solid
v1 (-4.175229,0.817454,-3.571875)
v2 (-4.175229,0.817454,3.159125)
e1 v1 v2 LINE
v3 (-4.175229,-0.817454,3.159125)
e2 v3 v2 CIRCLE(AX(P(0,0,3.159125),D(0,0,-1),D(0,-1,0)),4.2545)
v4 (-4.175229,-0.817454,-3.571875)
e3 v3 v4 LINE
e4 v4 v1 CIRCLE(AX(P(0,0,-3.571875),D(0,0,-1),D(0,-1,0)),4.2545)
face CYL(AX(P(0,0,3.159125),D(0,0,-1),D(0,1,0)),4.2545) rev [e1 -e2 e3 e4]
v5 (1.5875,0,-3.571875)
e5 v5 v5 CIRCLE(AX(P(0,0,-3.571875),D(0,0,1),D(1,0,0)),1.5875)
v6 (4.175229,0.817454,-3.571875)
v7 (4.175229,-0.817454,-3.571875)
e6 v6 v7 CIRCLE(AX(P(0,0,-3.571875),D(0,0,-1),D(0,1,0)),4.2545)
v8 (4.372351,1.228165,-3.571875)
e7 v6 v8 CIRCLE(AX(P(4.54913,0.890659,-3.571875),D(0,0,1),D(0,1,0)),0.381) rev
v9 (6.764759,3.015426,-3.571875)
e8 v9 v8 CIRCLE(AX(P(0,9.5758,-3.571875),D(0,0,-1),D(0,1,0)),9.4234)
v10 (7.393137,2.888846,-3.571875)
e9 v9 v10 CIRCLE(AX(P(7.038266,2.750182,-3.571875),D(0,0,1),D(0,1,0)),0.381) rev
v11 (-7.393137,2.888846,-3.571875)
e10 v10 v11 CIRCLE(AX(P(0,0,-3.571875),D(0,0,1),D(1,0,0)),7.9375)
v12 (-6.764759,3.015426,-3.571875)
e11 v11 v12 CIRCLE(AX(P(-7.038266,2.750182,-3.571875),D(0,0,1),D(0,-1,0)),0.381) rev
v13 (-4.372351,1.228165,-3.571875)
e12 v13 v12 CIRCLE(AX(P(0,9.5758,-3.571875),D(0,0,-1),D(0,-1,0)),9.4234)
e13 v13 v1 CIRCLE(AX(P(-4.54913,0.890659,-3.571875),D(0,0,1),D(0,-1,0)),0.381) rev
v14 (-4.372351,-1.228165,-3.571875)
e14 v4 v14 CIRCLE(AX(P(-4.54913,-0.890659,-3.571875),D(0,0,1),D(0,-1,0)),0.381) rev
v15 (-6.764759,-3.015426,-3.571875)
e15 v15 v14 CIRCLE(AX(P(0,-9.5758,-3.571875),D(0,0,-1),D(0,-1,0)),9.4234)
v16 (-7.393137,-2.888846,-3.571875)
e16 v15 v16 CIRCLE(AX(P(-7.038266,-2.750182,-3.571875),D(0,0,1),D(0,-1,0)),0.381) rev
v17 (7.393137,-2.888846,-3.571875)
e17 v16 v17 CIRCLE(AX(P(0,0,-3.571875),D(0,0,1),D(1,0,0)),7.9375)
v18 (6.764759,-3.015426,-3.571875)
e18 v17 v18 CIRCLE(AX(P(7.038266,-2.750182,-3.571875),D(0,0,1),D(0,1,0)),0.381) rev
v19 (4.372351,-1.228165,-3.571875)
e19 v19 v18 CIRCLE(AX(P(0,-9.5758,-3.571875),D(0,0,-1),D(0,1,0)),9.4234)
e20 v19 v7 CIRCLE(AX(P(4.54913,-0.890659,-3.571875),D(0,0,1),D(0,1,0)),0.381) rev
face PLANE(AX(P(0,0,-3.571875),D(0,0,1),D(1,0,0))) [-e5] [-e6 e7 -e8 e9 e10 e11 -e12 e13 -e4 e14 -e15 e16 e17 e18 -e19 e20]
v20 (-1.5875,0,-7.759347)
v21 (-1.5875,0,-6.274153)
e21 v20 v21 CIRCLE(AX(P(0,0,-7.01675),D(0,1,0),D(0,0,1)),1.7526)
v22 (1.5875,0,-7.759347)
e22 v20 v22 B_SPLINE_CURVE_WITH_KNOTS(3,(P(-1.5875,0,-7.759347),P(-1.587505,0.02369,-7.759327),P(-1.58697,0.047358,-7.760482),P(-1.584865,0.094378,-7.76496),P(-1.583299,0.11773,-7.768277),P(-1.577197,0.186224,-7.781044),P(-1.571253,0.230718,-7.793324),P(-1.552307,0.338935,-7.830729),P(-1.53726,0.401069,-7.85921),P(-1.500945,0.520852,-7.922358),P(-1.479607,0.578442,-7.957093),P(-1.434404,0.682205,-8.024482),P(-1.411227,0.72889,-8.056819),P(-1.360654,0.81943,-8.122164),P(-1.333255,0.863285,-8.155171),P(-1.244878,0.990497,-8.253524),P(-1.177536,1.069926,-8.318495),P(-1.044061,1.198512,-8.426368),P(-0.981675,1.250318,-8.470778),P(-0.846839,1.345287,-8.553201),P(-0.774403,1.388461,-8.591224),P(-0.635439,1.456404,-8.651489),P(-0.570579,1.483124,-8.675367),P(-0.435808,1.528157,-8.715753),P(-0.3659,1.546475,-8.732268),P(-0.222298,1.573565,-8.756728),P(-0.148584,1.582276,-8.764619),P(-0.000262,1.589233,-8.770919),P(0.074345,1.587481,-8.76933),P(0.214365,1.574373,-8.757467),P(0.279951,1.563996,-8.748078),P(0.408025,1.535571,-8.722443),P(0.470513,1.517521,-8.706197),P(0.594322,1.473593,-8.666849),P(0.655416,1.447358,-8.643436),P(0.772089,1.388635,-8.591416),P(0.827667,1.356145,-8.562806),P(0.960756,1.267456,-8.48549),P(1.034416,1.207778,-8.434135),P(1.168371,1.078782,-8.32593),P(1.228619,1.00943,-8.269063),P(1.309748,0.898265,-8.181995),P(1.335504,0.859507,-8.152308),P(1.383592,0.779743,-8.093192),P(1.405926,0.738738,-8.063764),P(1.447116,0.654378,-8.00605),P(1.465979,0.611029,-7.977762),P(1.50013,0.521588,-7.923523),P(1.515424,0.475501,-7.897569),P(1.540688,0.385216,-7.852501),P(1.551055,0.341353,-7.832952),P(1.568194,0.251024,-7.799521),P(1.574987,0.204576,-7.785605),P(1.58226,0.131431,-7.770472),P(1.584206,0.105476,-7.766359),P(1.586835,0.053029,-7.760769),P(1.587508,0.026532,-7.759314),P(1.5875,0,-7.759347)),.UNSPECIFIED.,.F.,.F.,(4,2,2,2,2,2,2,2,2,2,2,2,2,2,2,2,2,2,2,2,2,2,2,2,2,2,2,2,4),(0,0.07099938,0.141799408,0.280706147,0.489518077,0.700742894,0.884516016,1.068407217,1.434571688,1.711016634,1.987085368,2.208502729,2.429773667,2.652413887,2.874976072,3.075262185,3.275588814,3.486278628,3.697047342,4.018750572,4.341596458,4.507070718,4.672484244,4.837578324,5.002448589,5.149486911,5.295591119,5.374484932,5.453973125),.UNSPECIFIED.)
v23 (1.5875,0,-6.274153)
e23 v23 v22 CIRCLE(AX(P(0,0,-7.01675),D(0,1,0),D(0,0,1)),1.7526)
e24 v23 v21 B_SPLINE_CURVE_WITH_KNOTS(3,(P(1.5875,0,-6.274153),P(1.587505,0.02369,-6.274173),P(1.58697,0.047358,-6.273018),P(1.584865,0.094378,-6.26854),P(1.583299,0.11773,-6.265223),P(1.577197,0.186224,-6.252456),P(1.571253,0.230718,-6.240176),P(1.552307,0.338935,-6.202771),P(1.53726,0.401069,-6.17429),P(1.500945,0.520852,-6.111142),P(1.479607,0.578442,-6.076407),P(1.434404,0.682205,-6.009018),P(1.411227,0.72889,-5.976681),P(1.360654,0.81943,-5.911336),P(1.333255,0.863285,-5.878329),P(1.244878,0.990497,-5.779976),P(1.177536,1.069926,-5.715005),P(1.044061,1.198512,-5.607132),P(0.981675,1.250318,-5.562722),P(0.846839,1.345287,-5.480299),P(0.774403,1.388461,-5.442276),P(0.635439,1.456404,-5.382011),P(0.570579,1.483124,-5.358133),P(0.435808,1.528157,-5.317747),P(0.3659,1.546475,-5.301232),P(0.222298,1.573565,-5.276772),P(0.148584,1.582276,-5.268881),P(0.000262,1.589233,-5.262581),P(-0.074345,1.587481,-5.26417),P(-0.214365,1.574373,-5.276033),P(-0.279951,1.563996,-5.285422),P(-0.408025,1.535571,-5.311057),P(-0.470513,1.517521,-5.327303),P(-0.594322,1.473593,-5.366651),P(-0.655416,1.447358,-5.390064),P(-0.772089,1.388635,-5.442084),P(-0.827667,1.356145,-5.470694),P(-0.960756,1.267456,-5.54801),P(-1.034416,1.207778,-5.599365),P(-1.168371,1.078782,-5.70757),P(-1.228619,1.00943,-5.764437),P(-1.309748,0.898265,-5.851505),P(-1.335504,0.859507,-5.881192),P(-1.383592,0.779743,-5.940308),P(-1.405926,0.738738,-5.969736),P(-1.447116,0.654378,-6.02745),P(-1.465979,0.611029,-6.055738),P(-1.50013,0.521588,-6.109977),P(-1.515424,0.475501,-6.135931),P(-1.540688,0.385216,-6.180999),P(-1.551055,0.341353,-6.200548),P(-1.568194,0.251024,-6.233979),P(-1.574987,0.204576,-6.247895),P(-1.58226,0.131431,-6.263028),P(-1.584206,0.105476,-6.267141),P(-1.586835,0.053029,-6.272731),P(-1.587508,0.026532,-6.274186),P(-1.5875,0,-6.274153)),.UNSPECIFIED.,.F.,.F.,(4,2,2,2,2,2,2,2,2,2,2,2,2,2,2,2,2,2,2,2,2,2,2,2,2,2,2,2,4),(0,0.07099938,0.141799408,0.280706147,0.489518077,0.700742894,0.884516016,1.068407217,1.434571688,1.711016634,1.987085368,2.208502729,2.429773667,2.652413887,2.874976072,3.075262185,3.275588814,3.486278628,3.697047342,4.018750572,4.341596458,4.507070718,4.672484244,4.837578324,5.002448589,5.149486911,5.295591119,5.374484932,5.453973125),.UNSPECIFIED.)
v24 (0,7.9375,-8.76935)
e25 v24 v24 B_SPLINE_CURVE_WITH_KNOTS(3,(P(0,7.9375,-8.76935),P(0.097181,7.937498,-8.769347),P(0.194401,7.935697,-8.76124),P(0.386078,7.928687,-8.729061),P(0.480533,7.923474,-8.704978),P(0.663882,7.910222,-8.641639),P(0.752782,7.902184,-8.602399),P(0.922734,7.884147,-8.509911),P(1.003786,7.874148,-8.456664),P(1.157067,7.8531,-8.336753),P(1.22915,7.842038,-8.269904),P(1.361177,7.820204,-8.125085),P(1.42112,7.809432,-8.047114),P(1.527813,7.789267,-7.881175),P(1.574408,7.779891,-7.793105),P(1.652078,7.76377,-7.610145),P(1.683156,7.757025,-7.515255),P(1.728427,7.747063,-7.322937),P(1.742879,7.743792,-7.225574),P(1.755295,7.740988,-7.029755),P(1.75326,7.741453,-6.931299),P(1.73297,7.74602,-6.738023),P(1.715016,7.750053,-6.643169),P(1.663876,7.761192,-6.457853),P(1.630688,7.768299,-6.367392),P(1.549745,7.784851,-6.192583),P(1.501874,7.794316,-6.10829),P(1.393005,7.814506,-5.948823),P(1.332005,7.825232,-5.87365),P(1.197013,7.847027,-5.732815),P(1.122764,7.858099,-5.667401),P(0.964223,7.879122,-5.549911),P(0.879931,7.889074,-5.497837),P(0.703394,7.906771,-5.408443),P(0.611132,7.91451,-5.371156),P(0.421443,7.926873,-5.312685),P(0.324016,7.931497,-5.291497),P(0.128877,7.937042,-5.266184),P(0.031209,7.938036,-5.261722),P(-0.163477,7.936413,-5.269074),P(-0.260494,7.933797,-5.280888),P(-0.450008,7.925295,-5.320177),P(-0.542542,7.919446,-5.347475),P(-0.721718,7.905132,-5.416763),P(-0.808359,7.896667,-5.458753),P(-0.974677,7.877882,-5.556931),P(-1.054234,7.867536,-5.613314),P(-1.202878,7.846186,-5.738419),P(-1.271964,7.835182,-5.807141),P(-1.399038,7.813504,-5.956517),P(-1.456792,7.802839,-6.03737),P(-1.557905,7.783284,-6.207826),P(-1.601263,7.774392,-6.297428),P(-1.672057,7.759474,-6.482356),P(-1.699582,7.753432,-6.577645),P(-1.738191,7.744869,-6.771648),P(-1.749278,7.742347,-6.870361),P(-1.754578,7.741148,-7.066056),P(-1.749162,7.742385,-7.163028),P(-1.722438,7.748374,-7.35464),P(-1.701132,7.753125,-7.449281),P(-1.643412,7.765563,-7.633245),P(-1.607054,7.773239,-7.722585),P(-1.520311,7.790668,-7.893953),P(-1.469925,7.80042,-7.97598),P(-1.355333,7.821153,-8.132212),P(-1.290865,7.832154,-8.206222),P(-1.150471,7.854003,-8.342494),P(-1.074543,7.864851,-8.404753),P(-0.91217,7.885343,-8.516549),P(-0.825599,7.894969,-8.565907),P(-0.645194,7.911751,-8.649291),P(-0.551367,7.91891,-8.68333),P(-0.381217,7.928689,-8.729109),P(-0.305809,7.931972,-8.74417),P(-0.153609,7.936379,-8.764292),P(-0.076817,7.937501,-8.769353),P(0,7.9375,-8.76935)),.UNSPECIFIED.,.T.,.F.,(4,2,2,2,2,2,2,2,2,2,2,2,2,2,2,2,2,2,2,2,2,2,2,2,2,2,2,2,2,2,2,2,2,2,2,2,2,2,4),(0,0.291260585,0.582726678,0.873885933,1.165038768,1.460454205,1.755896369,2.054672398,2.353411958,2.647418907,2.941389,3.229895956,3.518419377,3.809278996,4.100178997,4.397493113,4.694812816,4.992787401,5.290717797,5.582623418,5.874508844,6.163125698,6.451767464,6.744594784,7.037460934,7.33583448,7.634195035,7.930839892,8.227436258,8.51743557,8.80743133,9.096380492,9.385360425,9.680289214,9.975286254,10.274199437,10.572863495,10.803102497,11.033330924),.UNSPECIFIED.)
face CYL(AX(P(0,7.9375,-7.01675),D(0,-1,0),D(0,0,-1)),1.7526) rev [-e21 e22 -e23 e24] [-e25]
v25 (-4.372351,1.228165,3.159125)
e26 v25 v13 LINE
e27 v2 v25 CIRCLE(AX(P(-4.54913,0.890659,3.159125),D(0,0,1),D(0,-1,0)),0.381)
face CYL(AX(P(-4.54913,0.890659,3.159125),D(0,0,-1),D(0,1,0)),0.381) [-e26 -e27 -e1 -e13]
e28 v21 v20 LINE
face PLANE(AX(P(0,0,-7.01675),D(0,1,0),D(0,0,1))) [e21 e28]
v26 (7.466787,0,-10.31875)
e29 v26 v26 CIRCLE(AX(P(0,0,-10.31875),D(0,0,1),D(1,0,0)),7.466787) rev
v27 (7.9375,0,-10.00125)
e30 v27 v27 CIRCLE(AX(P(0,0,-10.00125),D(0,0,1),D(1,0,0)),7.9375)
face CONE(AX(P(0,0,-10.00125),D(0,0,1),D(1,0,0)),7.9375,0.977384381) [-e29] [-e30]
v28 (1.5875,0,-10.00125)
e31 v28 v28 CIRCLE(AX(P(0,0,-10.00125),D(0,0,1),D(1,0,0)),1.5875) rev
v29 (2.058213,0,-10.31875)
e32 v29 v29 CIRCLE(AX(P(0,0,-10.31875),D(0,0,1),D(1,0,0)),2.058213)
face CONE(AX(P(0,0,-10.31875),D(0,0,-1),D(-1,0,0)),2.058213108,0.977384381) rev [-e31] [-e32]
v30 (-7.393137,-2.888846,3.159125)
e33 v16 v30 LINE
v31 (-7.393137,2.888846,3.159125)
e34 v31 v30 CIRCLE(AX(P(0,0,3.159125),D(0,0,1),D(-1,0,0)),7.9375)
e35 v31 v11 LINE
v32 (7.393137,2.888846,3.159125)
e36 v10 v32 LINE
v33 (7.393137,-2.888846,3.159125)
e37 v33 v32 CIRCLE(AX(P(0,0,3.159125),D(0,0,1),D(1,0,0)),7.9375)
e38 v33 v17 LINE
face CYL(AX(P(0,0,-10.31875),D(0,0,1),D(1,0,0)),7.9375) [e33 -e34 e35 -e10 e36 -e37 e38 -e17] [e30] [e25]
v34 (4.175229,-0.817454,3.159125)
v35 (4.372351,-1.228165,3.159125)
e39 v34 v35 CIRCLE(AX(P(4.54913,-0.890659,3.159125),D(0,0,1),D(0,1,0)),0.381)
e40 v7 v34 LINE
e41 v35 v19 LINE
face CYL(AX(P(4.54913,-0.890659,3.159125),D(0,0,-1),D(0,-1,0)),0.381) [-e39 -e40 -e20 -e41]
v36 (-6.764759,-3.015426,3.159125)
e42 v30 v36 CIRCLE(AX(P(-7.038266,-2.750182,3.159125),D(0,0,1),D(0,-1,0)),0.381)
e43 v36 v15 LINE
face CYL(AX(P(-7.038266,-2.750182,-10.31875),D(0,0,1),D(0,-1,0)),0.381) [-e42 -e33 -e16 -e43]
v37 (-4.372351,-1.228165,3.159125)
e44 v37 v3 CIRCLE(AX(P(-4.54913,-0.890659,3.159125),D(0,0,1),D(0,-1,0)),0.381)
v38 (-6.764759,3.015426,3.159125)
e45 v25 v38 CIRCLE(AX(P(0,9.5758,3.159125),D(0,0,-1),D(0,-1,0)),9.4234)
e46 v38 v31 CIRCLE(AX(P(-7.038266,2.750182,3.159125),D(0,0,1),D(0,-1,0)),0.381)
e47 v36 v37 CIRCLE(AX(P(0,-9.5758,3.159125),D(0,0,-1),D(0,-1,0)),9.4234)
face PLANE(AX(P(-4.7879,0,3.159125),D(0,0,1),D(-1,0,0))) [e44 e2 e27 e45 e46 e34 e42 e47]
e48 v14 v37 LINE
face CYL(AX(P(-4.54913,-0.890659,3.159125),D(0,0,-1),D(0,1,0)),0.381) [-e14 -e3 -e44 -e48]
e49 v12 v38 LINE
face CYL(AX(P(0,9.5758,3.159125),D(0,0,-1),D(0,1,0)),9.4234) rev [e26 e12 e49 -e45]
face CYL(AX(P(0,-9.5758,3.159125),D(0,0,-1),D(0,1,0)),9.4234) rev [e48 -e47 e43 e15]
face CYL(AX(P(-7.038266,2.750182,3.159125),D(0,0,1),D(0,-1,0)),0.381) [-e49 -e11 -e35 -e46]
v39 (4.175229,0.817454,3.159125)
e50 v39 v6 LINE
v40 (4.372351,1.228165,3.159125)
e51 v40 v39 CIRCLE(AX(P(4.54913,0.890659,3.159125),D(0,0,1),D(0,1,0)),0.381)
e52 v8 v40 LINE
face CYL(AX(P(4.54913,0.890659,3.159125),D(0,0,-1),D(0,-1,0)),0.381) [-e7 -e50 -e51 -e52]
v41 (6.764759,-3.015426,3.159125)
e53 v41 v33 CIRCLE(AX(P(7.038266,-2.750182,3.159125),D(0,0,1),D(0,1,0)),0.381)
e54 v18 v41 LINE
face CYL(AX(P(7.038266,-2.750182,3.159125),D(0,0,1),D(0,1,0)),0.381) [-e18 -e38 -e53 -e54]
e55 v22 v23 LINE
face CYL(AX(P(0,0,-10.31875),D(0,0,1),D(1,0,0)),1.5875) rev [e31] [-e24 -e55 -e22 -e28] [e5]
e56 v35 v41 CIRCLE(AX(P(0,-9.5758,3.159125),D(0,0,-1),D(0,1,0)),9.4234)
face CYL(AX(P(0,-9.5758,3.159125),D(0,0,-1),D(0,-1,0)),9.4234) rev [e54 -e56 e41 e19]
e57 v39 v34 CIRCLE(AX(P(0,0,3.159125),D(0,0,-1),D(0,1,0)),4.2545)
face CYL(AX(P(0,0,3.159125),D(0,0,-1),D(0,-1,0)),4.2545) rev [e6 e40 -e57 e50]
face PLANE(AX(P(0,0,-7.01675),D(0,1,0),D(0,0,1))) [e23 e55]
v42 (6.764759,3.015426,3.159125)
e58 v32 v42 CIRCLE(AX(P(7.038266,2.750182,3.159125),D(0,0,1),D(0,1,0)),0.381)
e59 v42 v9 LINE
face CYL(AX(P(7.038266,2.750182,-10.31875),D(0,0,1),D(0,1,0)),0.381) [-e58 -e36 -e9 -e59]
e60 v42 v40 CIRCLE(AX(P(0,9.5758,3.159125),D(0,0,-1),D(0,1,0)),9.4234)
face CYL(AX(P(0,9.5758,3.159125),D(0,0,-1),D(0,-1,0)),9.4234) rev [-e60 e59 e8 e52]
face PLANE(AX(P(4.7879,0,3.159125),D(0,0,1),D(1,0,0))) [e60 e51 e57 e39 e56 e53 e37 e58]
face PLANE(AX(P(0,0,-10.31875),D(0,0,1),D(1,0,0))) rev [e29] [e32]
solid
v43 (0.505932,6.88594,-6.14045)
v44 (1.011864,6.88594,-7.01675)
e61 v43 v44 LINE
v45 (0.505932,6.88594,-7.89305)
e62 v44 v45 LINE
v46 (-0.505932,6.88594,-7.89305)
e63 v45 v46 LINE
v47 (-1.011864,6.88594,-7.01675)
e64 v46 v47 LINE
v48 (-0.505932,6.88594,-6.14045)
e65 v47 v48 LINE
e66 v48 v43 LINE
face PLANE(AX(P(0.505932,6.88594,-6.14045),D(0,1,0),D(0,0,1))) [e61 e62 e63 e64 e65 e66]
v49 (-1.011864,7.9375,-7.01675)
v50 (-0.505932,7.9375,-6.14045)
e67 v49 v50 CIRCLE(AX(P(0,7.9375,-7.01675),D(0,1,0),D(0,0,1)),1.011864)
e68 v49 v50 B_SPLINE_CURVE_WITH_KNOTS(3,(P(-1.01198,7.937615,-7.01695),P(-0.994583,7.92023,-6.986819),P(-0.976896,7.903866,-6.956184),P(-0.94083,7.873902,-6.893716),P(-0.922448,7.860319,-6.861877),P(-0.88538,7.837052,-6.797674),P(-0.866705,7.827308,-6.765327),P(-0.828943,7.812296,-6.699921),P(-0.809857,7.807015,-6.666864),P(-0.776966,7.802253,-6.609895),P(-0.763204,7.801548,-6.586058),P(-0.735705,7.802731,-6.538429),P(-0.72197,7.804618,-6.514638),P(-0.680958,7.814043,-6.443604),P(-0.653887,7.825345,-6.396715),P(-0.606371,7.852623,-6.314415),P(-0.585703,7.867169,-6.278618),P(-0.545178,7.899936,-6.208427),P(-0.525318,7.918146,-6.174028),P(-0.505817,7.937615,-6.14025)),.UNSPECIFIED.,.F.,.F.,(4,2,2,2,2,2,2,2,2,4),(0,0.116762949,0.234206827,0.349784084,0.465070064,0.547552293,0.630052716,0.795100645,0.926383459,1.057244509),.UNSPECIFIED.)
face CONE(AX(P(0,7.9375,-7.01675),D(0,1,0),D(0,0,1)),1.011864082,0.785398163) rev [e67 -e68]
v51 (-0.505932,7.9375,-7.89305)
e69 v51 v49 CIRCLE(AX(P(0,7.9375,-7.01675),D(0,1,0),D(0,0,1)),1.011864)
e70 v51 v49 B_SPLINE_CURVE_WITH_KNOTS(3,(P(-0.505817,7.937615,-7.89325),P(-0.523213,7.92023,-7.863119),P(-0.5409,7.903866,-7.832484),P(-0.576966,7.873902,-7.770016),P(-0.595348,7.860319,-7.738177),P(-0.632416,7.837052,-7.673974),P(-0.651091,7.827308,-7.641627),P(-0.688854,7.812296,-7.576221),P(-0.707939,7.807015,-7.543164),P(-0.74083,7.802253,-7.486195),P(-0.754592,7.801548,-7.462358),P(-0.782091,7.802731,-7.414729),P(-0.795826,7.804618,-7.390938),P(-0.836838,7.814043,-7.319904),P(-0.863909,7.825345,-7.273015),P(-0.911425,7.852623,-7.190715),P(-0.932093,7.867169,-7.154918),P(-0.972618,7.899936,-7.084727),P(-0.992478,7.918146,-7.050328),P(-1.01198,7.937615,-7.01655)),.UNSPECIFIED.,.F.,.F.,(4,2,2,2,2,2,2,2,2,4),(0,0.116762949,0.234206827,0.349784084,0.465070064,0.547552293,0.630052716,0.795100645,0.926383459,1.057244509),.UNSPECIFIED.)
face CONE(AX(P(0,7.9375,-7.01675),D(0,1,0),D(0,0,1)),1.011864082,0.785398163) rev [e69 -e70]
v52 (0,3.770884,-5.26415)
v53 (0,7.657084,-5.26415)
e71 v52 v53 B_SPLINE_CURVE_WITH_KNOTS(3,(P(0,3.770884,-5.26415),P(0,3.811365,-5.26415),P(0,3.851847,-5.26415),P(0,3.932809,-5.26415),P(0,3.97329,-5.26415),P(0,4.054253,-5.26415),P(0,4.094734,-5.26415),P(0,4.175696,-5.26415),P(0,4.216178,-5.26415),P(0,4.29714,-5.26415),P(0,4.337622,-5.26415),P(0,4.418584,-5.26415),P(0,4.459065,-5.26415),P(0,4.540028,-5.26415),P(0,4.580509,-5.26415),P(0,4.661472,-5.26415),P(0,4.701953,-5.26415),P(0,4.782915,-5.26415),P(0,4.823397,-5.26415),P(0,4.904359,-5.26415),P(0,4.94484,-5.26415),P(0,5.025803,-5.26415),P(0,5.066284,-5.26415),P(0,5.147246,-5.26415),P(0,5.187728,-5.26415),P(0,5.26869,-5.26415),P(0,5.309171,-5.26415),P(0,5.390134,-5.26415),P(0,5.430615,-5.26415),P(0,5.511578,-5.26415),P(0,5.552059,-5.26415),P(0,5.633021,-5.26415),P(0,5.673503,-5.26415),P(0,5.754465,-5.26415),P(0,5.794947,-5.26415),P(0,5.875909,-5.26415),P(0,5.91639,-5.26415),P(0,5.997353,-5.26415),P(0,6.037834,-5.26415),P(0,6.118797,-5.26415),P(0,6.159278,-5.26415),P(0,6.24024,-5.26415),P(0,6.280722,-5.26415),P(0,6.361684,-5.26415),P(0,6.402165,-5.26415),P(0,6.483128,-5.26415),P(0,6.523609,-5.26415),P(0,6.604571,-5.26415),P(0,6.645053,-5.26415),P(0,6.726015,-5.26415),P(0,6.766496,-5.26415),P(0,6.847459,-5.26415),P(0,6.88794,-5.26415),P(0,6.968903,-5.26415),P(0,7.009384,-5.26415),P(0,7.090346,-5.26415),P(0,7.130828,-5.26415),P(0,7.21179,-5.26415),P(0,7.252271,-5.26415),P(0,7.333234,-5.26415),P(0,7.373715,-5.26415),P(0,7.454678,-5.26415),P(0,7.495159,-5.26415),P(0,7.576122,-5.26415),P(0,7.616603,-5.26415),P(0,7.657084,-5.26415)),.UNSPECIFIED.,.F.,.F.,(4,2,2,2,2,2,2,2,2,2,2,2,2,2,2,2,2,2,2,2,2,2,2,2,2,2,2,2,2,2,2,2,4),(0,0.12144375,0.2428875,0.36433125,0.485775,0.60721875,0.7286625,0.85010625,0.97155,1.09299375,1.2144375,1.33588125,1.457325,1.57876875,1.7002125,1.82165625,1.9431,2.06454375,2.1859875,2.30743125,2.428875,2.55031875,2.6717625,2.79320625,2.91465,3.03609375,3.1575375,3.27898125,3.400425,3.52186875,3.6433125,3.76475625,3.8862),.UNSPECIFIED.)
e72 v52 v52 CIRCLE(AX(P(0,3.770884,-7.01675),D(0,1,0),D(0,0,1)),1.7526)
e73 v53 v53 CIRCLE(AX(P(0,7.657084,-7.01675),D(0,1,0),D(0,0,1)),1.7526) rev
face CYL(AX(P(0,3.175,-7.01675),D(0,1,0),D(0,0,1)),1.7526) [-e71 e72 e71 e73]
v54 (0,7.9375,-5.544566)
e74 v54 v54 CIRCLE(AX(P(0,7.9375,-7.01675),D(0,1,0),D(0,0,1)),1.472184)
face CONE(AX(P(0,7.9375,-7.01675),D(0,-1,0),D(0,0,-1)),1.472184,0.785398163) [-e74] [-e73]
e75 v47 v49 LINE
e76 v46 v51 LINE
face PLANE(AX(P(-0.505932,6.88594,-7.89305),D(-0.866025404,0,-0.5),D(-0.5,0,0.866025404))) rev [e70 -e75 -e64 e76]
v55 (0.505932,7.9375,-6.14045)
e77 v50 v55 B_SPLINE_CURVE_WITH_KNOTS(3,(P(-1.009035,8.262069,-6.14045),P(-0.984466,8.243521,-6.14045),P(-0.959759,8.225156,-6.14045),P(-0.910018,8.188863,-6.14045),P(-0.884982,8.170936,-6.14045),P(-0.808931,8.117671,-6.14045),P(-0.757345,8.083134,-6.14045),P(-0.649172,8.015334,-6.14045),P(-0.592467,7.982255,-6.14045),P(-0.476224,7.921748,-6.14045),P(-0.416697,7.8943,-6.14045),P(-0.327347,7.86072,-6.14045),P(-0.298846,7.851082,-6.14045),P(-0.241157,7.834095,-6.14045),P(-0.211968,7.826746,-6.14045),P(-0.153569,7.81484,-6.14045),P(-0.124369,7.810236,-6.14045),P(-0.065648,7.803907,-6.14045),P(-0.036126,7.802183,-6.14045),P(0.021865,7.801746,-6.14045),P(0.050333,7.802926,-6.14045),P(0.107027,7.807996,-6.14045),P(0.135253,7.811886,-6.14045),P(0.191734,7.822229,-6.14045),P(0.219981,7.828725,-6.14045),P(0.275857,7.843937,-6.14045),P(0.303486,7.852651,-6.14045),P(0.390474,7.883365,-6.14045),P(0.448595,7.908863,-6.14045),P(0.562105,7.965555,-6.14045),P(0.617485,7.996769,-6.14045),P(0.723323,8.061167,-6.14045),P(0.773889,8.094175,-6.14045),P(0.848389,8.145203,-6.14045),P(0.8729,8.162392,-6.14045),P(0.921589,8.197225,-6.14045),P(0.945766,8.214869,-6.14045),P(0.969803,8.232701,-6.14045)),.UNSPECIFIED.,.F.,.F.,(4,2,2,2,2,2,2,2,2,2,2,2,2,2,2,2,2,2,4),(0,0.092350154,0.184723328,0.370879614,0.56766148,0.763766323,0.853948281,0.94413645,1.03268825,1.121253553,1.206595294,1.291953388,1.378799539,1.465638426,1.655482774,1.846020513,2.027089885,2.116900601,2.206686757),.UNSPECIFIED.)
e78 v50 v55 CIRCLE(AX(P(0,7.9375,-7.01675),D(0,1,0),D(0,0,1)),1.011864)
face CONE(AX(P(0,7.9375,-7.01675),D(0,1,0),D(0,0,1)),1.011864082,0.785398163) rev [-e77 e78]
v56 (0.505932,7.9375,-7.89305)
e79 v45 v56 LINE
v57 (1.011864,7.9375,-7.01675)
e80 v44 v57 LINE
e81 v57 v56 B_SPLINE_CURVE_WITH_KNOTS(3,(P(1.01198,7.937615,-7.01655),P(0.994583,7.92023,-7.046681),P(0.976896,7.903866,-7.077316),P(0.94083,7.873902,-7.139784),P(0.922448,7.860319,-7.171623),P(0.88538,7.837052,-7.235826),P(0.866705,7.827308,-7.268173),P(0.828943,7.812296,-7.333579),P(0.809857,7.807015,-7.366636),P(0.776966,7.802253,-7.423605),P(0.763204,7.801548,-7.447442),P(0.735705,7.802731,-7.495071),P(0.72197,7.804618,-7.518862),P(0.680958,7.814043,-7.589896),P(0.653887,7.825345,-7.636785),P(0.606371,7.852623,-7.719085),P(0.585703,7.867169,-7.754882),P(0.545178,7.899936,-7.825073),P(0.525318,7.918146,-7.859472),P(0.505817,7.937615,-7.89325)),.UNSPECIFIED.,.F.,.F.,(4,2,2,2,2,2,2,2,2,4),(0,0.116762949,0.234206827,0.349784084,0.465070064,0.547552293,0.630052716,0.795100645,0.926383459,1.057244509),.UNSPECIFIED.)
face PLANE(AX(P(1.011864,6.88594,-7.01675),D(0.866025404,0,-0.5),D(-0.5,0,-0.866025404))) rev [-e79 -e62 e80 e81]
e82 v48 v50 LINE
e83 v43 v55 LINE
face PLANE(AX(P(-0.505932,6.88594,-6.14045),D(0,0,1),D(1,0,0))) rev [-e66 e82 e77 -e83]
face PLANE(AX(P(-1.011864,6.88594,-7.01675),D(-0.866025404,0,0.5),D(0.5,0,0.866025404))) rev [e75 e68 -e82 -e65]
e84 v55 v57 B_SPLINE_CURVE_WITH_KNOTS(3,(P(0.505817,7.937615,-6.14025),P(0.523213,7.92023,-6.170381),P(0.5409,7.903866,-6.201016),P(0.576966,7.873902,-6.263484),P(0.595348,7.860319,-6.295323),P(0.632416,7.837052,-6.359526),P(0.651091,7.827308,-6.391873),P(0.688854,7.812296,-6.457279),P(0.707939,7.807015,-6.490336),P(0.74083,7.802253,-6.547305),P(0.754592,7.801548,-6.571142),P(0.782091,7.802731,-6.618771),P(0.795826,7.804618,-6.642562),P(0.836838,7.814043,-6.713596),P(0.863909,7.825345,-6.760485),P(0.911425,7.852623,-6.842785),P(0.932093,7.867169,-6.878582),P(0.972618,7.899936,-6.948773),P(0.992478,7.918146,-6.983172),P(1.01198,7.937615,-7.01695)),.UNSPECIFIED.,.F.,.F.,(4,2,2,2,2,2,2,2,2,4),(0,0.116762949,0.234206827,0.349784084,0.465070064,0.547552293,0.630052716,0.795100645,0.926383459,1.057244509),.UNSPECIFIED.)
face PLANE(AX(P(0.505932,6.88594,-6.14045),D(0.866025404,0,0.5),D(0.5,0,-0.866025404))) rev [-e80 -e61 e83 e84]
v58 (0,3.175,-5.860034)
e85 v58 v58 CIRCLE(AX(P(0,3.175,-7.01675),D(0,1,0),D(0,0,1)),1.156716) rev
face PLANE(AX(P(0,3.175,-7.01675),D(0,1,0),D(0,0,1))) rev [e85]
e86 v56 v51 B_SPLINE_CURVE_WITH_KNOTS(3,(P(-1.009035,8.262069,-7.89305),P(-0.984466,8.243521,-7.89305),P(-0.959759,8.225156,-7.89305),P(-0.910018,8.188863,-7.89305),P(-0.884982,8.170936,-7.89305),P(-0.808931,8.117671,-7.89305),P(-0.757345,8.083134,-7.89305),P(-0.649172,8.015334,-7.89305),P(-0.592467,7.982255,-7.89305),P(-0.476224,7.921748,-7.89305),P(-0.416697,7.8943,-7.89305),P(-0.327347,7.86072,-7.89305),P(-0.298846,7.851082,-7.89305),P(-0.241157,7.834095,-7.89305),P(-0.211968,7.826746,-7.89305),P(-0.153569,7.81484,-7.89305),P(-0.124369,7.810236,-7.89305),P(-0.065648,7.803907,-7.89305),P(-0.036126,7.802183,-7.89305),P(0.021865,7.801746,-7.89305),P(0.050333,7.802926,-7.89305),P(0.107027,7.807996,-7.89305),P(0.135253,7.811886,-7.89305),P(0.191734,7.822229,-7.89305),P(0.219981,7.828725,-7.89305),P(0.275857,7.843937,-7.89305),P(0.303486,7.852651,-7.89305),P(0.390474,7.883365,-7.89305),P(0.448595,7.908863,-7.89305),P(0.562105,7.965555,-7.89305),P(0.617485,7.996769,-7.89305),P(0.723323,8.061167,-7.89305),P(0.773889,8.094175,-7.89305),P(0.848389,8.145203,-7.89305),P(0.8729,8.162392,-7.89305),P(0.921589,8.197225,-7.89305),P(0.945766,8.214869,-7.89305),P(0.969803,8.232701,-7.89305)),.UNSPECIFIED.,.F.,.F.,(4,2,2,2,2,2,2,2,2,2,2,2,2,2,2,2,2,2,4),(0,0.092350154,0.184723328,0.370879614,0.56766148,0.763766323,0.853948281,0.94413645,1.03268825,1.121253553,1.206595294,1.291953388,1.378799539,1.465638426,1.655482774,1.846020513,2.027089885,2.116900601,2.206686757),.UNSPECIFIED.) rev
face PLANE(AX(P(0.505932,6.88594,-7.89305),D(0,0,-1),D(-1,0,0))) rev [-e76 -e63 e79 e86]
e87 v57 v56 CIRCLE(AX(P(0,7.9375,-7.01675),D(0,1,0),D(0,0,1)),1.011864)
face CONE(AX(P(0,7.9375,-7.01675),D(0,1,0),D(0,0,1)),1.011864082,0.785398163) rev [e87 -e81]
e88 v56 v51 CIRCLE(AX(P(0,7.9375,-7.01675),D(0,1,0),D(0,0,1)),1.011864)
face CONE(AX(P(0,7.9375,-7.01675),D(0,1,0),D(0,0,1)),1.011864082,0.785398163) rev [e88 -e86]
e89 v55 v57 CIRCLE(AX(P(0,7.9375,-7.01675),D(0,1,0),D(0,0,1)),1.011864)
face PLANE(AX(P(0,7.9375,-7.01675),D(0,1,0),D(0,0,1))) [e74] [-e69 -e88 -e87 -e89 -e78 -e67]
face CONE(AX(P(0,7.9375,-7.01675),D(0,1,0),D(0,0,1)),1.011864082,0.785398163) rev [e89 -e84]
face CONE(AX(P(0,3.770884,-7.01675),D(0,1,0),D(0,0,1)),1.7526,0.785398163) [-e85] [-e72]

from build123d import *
from OCP.BRepFilletAPI import BRepFilletAPI_MakeChamfer
from build123d.topology import SkipClean

# Parameters (mm, degrees)
BOSS_EXTRUDE1_START     = -3.571875
SKETCH1_R               = 7.9375
BOSS_EXTRUDE1_DEPTH     = 6.746875
BOSS_EXTRUDE4_START     = 6.731
BOSS_EXTRUDE4_DEPTH     = 6.731
FILLET2_R               = 0.381
MOVE_START              = -3.571875
MOVE_FACE3_DEPTH        = 6.731
MOVE_FACE3_2_DEPTH      = 6.731
CIRPATTERN2_START       = -3.571875
CIRPATTERN2_DEPTH       = 6.731
CUT_EXTRUDE5_DEPTH      = 16.24743959
CUT_EXTRUDE5_DEPTH_BACK = 16.24743959
SKETCH15_R              = 1.5875
CHAMFER1_SIZE           = 0.3175
CHAMFER1_SIZE2          = 0.470713108
SKETCH5_R               = 1.7526
CUT_EXTRUDE2_DEPTH      = 16.24743959
SKETCH6_R               = 1.7526
BOSS_EXTRUDE3_DEPTH     = 4.7625
CUT_EXTRUDE3_DEPTH      = 1.05156
CHAMFER3_SIZE           = 0.280416
CHAMFER4_SIZE           = 0.595884


# Read off the part's stored shape, not the designer's step: Move Face3, CirPattern2
with BuildPart() as part:
    # Sketch1 → Boss-Extrude1 (new body)
    with BuildSketch(Plane.XY.offset(BOSS_EXTRUDE1_START)):
        Circle(SKETCH1_R)
    extrude(amount=-BOSS_EXTRUDE1_DEPTH)

    # Sketch10 → Boss-Extrude4 (add)
    with BuildSketch(Plane.XY.offset(-3.571875).offset(BOSS_EXTRUDE4_START)):
        with BuildLine():
            ThreePointArc((-1.096318236, -4.110821886), (0, -4.2545), (1.096318236, -4.110821886))
            ThreePointArc((1.096318236, -4.110821886), (2.111997853, -5.752575517), (3.440933621, -7.152893266))
            ThreePointArc((3.440933621, -7.152893266), (0, -7.9375), (-3.440933621, -7.152893266))
            ThreePointArc((-3.440933621, -7.152893266), (-2.111997853, -5.752575517), (-1.096318236, -4.110821886))
        make_face()
    extrude(amount=-BOSS_EXTRUDE4_DEPTH)

    # Fillet2
    fillet2_edges = [part.edges().sort_by_distance(p)[0] for p in [
        (-3.440933621, -7.152893266, -0.206375),
        (3.440933621, -7.152893266, -0.206375),
        (-1.096318236, -4.110821886, -0.206375),
        (1.096318236, -4.110821886, -0.206375),
    ]]
    fillet(fillet2_edges, radius=FILLET2_R)

    # Move Face3 outline → Move Face3 (cut)
    with BuildSketch(Plane.XY.offset(MOVE_START)):
        with BuildLine():
            ThreePointArc((-3.015425868, -6.764758592), (-3.123679186, -7.113503156), (-2.888846251, -7.393136925))
            ThreePointArc((-2.888846251, -7.393136925), (0, -7.9375), (2.888846251, -7.393136925))
            ThreePointArc((2.888846251, -7.393136925), (3.123679186, -7.113503156), (3.015425868, -6.764758592))
            ThreePointArc((3.015425868, -6.764758592), (2.026423119, -5.639802857), (1.228164561, -4.372350642))
            ThreePointArc((1.228164561, -4.372350642), (1.055516359, -4.205643666), (0.817454229, -4.175229195))
            ThreePointArc((0.817454229, -4.175229195), (0, -4.2545), (-0.817454229, -4.175229195))
            ThreePointArc((-0.817454229, -4.175229195), (-1.055516359, -4.205643666), (-1.228164561, -4.372350642))
            ThreePointArc((-1.228164561, -4.372350642), (-2.026423119, -5.639802857), (-3.015425868, -6.764758592))
        make_face()
    extrude(amount=MOVE_FACE3_DEPTH, mode=Mode.SUBTRACT)

    # Move Face3 2 outline → Move Face3 2 (add)
    with SkipClean():  # the faces are left unmerged after this step: merging them gives an invalid solid
        with BuildSketch(Plane.XY.offset(MOVE_START)):
            with BuildLine():
                ThreePointArc((7.393136925, 2.888846251), (7.113503156, 3.123679186), (6.764758592, 3.015425868))
                ThreePointArc((6.764758592, 3.015425868), (5.639802857, 2.026423119), (4.372350642, 1.228164561))
                ThreePointArc((4.372350642, 1.228164561), (4.205643666, 1.055516359), (4.175229195, 0.817454229))
                ThreePointArc((4.175229195, 0.817454229), (4.2545, 0), (4.175229195, -0.817454229))
                ThreePointArc((4.175229195, -0.817454229), (4.205643666, -1.055516359), (4.372350642, -1.228164561))
                ThreePointArc((4.372350642, -1.228164561), (5.639802857, -2.026423119), (6.764758592, -3.015425868))
                ThreePointArc((6.764758592, -3.015425868), (7.113503156, -3.123679186), (7.393136925, -2.888846251))
                ThreePointArc((7.393136925, -2.888846251), (7.9375, 0), (7.393136925, 2.888846251))
            make_face()
        extrude(amount=MOVE_FACE3_2_DEPTH)

    # CirPattern2 outline → CirPattern2 (add)
    with SkipClean():  # the faces are left unmerged after this step: merging them gives an invalid solid
        with BuildSketch(Plane.XY.offset(CIRPATTERN2_START)):
            with BuildLine():
                ThreePointArc((-4.372350642, 1.228164561), (-5.639802857, 2.026423119), (-6.764758592, 3.015425868))
                ThreePointArc((-6.764758592, 3.015425868), (-7.113503156, 3.123679186), (-7.393136925, 2.888846251))
                ThreePointArc((-7.393136925, 2.888846251), (-7.9375, 0), (-7.393136925, -2.888846251))
                ThreePointArc((-7.393136925, -2.888846251), (-7.113503156, -3.123679186), (-6.764758592, -3.015425868))
                ThreePointArc((-6.764758592, -3.015425868), (-5.639802857, -2.026423119), (-4.372350642, -1.228164561))
                ThreePointArc((-4.372350642, -1.228164561), (-4.205643666, -1.055516359), (-4.175229195, -0.817454229))
                ThreePointArc((-4.175229195, -0.817454229), (-4.2545, 0), (-4.175229195, 0.817454229))
                ThreePointArc((-4.175229195, 0.817454229), (-4.205643666, 1.055516359), (-4.372350642, 1.228164561))
            make_face()
        extrude(amount=CIRPATTERN2_DEPTH)

    # Sketch15 → Cut-Extrude5 (cut, two sides: drawn at the far end of the back side and taken through both)
    with SkipClean():  # the faces are left unmerged after this step: merging them gives an invalid solid
        with BuildSketch(Plane.XY.offset(-CUT_EXTRUDE5_DEPTH_BACK)):
            Circle(SKETCH15_R)
        extrude(amount=CUT_EXTRUDE5_DEPTH + CUT_EXTRUDE5_DEPTH_BACK, mode=Mode.SUBTRACT)

    # Chamfer1: one chamfer whose edges measure the first distance from different faces: ONE call of the kernel's chamfer builder (chamfer() names one face for all edges)
    chamfer1_edges_1 = [part.edges().sort_by_distance(p)[0] for p in [
        (-7.9375, 0, -10.31875),
    ]]
    chamfer1_side_1 = [part.faces().sort_by_distance(p)[0] for p in [
        (-7.9375, 0, -6.9453125),
    ]]
    chamfer1_edges_2 = [part.edges().sort_by_distance(p)[0] for p in [
        (-1.5875, 0, -10.31875),
    ]]
    chamfer1_side_2 = [part.faces().sort_by_distance(p)[0] for p in [
        (-1.5875, 0, -6.9453125),
    ]]
    chamfer1 = BRepFilletAPI_MakeChamfer(part.part.solid().wrapped)
    for e in chamfer1_edges_1:
        chamfer1.Add(CHAMFER1_SIZE, CHAMFER1_SIZE2, e.wrapped, chamfer1_side_1[0].wrapped)  # the first distance lies on this face
    for e in chamfer1_edges_2:
        chamfer1.Add(CHAMFER1_SIZE, CHAMFER1_SIZE2, e.wrapped, chamfer1_side_2[0].wrapped)  # the first distance lies on this face
    add(Compound.cast(chamfer1.Shape()), mode=Mode.REPLACE)

    # Sketch5 → Cut-Extrude2 (cut, through all)
    with SkipClean():  # the faces are left unmerged after this step: merging them gives an invalid solid
        with BuildSketch(Plane(origin=(0, 0, 0), x_dir=(1, 0, 0), z_dir=(0, 1, 0))):
            with Locations(Location((0, 7.01675, 0), (0, 0, 90))):
                Circle(SKETCH5_R)
        extrude(amount=CUT_EXTRUDE2_DEPTH, mode=Mode.SUBTRACT)


with BuildPart() as body_2:
    # Sketch6 → Boss-Extrude3 (new body)
    with BuildSketch(Plane(origin=(0, 7.9375, 0), x_dir=(-1, 0, 0), z_dir=(0, 1, 0))):
        with Locations(Location((0, -7.01675, 0), (0, 0, 90))):
            Circle(SKETCH6_R)
    extrude(amount=-BOSS_EXTRUDE3_DEPTH)

    # Sketch8 → Cut-Extrude3 (cut)
    with BuildSketch(Plane(origin=(0, 7.9375, 0), x_dir=(1, 0, 0), z_dir=(0, 1, 0))):
        Polygon((0.505932041, 6.14045), (1.011864082, 7.01675), (0.505932041, 7.89305), (-0.505932041, 7.89305), (-1.011864082, 7.01675), (-0.505932041, 6.14045), align=None)
    extrude(amount=-CUT_EXTRUDE3_DEPTH, mode=Mode.SUBTRACT)

    # Cut-Extrude4 cone 1 section (through the dimple's axis) → Cut-Extrude4 (revolve, cut)
    with BuildSketch(Plane(origin=(0, 7.9375, -7.01675), x_dir=(0, 0, 1), z_dir=(1, 0, 0))):
        Polygon((0, 0), (1.011864082, 0), (0, 1.011864082), align=None)
    revolve(axis=Axis((0, 7.9375, -7.01675), (0, -1, 0)), mode=Mode.SUBTRACT)

    # Chamfer3
    chamfer3_edges = [body_2.edges().sort_by_distance(p)[0] for p in [
        (0, 7.9375, -8.76935),
    ]]
    chamfer(chamfer3_edges, length=CHAMFER3_SIZE)

    # Chamfer4
    chamfer4_edges = [body_2.edges().sort_by_distance(p)[0] for p in [
        (0, 3.175, -8.76935),
    ]]
    chamfer(chamfer4_edges, length=CHAMFER4_SIZE)


solid = Compound([part.part, body_2.part])
